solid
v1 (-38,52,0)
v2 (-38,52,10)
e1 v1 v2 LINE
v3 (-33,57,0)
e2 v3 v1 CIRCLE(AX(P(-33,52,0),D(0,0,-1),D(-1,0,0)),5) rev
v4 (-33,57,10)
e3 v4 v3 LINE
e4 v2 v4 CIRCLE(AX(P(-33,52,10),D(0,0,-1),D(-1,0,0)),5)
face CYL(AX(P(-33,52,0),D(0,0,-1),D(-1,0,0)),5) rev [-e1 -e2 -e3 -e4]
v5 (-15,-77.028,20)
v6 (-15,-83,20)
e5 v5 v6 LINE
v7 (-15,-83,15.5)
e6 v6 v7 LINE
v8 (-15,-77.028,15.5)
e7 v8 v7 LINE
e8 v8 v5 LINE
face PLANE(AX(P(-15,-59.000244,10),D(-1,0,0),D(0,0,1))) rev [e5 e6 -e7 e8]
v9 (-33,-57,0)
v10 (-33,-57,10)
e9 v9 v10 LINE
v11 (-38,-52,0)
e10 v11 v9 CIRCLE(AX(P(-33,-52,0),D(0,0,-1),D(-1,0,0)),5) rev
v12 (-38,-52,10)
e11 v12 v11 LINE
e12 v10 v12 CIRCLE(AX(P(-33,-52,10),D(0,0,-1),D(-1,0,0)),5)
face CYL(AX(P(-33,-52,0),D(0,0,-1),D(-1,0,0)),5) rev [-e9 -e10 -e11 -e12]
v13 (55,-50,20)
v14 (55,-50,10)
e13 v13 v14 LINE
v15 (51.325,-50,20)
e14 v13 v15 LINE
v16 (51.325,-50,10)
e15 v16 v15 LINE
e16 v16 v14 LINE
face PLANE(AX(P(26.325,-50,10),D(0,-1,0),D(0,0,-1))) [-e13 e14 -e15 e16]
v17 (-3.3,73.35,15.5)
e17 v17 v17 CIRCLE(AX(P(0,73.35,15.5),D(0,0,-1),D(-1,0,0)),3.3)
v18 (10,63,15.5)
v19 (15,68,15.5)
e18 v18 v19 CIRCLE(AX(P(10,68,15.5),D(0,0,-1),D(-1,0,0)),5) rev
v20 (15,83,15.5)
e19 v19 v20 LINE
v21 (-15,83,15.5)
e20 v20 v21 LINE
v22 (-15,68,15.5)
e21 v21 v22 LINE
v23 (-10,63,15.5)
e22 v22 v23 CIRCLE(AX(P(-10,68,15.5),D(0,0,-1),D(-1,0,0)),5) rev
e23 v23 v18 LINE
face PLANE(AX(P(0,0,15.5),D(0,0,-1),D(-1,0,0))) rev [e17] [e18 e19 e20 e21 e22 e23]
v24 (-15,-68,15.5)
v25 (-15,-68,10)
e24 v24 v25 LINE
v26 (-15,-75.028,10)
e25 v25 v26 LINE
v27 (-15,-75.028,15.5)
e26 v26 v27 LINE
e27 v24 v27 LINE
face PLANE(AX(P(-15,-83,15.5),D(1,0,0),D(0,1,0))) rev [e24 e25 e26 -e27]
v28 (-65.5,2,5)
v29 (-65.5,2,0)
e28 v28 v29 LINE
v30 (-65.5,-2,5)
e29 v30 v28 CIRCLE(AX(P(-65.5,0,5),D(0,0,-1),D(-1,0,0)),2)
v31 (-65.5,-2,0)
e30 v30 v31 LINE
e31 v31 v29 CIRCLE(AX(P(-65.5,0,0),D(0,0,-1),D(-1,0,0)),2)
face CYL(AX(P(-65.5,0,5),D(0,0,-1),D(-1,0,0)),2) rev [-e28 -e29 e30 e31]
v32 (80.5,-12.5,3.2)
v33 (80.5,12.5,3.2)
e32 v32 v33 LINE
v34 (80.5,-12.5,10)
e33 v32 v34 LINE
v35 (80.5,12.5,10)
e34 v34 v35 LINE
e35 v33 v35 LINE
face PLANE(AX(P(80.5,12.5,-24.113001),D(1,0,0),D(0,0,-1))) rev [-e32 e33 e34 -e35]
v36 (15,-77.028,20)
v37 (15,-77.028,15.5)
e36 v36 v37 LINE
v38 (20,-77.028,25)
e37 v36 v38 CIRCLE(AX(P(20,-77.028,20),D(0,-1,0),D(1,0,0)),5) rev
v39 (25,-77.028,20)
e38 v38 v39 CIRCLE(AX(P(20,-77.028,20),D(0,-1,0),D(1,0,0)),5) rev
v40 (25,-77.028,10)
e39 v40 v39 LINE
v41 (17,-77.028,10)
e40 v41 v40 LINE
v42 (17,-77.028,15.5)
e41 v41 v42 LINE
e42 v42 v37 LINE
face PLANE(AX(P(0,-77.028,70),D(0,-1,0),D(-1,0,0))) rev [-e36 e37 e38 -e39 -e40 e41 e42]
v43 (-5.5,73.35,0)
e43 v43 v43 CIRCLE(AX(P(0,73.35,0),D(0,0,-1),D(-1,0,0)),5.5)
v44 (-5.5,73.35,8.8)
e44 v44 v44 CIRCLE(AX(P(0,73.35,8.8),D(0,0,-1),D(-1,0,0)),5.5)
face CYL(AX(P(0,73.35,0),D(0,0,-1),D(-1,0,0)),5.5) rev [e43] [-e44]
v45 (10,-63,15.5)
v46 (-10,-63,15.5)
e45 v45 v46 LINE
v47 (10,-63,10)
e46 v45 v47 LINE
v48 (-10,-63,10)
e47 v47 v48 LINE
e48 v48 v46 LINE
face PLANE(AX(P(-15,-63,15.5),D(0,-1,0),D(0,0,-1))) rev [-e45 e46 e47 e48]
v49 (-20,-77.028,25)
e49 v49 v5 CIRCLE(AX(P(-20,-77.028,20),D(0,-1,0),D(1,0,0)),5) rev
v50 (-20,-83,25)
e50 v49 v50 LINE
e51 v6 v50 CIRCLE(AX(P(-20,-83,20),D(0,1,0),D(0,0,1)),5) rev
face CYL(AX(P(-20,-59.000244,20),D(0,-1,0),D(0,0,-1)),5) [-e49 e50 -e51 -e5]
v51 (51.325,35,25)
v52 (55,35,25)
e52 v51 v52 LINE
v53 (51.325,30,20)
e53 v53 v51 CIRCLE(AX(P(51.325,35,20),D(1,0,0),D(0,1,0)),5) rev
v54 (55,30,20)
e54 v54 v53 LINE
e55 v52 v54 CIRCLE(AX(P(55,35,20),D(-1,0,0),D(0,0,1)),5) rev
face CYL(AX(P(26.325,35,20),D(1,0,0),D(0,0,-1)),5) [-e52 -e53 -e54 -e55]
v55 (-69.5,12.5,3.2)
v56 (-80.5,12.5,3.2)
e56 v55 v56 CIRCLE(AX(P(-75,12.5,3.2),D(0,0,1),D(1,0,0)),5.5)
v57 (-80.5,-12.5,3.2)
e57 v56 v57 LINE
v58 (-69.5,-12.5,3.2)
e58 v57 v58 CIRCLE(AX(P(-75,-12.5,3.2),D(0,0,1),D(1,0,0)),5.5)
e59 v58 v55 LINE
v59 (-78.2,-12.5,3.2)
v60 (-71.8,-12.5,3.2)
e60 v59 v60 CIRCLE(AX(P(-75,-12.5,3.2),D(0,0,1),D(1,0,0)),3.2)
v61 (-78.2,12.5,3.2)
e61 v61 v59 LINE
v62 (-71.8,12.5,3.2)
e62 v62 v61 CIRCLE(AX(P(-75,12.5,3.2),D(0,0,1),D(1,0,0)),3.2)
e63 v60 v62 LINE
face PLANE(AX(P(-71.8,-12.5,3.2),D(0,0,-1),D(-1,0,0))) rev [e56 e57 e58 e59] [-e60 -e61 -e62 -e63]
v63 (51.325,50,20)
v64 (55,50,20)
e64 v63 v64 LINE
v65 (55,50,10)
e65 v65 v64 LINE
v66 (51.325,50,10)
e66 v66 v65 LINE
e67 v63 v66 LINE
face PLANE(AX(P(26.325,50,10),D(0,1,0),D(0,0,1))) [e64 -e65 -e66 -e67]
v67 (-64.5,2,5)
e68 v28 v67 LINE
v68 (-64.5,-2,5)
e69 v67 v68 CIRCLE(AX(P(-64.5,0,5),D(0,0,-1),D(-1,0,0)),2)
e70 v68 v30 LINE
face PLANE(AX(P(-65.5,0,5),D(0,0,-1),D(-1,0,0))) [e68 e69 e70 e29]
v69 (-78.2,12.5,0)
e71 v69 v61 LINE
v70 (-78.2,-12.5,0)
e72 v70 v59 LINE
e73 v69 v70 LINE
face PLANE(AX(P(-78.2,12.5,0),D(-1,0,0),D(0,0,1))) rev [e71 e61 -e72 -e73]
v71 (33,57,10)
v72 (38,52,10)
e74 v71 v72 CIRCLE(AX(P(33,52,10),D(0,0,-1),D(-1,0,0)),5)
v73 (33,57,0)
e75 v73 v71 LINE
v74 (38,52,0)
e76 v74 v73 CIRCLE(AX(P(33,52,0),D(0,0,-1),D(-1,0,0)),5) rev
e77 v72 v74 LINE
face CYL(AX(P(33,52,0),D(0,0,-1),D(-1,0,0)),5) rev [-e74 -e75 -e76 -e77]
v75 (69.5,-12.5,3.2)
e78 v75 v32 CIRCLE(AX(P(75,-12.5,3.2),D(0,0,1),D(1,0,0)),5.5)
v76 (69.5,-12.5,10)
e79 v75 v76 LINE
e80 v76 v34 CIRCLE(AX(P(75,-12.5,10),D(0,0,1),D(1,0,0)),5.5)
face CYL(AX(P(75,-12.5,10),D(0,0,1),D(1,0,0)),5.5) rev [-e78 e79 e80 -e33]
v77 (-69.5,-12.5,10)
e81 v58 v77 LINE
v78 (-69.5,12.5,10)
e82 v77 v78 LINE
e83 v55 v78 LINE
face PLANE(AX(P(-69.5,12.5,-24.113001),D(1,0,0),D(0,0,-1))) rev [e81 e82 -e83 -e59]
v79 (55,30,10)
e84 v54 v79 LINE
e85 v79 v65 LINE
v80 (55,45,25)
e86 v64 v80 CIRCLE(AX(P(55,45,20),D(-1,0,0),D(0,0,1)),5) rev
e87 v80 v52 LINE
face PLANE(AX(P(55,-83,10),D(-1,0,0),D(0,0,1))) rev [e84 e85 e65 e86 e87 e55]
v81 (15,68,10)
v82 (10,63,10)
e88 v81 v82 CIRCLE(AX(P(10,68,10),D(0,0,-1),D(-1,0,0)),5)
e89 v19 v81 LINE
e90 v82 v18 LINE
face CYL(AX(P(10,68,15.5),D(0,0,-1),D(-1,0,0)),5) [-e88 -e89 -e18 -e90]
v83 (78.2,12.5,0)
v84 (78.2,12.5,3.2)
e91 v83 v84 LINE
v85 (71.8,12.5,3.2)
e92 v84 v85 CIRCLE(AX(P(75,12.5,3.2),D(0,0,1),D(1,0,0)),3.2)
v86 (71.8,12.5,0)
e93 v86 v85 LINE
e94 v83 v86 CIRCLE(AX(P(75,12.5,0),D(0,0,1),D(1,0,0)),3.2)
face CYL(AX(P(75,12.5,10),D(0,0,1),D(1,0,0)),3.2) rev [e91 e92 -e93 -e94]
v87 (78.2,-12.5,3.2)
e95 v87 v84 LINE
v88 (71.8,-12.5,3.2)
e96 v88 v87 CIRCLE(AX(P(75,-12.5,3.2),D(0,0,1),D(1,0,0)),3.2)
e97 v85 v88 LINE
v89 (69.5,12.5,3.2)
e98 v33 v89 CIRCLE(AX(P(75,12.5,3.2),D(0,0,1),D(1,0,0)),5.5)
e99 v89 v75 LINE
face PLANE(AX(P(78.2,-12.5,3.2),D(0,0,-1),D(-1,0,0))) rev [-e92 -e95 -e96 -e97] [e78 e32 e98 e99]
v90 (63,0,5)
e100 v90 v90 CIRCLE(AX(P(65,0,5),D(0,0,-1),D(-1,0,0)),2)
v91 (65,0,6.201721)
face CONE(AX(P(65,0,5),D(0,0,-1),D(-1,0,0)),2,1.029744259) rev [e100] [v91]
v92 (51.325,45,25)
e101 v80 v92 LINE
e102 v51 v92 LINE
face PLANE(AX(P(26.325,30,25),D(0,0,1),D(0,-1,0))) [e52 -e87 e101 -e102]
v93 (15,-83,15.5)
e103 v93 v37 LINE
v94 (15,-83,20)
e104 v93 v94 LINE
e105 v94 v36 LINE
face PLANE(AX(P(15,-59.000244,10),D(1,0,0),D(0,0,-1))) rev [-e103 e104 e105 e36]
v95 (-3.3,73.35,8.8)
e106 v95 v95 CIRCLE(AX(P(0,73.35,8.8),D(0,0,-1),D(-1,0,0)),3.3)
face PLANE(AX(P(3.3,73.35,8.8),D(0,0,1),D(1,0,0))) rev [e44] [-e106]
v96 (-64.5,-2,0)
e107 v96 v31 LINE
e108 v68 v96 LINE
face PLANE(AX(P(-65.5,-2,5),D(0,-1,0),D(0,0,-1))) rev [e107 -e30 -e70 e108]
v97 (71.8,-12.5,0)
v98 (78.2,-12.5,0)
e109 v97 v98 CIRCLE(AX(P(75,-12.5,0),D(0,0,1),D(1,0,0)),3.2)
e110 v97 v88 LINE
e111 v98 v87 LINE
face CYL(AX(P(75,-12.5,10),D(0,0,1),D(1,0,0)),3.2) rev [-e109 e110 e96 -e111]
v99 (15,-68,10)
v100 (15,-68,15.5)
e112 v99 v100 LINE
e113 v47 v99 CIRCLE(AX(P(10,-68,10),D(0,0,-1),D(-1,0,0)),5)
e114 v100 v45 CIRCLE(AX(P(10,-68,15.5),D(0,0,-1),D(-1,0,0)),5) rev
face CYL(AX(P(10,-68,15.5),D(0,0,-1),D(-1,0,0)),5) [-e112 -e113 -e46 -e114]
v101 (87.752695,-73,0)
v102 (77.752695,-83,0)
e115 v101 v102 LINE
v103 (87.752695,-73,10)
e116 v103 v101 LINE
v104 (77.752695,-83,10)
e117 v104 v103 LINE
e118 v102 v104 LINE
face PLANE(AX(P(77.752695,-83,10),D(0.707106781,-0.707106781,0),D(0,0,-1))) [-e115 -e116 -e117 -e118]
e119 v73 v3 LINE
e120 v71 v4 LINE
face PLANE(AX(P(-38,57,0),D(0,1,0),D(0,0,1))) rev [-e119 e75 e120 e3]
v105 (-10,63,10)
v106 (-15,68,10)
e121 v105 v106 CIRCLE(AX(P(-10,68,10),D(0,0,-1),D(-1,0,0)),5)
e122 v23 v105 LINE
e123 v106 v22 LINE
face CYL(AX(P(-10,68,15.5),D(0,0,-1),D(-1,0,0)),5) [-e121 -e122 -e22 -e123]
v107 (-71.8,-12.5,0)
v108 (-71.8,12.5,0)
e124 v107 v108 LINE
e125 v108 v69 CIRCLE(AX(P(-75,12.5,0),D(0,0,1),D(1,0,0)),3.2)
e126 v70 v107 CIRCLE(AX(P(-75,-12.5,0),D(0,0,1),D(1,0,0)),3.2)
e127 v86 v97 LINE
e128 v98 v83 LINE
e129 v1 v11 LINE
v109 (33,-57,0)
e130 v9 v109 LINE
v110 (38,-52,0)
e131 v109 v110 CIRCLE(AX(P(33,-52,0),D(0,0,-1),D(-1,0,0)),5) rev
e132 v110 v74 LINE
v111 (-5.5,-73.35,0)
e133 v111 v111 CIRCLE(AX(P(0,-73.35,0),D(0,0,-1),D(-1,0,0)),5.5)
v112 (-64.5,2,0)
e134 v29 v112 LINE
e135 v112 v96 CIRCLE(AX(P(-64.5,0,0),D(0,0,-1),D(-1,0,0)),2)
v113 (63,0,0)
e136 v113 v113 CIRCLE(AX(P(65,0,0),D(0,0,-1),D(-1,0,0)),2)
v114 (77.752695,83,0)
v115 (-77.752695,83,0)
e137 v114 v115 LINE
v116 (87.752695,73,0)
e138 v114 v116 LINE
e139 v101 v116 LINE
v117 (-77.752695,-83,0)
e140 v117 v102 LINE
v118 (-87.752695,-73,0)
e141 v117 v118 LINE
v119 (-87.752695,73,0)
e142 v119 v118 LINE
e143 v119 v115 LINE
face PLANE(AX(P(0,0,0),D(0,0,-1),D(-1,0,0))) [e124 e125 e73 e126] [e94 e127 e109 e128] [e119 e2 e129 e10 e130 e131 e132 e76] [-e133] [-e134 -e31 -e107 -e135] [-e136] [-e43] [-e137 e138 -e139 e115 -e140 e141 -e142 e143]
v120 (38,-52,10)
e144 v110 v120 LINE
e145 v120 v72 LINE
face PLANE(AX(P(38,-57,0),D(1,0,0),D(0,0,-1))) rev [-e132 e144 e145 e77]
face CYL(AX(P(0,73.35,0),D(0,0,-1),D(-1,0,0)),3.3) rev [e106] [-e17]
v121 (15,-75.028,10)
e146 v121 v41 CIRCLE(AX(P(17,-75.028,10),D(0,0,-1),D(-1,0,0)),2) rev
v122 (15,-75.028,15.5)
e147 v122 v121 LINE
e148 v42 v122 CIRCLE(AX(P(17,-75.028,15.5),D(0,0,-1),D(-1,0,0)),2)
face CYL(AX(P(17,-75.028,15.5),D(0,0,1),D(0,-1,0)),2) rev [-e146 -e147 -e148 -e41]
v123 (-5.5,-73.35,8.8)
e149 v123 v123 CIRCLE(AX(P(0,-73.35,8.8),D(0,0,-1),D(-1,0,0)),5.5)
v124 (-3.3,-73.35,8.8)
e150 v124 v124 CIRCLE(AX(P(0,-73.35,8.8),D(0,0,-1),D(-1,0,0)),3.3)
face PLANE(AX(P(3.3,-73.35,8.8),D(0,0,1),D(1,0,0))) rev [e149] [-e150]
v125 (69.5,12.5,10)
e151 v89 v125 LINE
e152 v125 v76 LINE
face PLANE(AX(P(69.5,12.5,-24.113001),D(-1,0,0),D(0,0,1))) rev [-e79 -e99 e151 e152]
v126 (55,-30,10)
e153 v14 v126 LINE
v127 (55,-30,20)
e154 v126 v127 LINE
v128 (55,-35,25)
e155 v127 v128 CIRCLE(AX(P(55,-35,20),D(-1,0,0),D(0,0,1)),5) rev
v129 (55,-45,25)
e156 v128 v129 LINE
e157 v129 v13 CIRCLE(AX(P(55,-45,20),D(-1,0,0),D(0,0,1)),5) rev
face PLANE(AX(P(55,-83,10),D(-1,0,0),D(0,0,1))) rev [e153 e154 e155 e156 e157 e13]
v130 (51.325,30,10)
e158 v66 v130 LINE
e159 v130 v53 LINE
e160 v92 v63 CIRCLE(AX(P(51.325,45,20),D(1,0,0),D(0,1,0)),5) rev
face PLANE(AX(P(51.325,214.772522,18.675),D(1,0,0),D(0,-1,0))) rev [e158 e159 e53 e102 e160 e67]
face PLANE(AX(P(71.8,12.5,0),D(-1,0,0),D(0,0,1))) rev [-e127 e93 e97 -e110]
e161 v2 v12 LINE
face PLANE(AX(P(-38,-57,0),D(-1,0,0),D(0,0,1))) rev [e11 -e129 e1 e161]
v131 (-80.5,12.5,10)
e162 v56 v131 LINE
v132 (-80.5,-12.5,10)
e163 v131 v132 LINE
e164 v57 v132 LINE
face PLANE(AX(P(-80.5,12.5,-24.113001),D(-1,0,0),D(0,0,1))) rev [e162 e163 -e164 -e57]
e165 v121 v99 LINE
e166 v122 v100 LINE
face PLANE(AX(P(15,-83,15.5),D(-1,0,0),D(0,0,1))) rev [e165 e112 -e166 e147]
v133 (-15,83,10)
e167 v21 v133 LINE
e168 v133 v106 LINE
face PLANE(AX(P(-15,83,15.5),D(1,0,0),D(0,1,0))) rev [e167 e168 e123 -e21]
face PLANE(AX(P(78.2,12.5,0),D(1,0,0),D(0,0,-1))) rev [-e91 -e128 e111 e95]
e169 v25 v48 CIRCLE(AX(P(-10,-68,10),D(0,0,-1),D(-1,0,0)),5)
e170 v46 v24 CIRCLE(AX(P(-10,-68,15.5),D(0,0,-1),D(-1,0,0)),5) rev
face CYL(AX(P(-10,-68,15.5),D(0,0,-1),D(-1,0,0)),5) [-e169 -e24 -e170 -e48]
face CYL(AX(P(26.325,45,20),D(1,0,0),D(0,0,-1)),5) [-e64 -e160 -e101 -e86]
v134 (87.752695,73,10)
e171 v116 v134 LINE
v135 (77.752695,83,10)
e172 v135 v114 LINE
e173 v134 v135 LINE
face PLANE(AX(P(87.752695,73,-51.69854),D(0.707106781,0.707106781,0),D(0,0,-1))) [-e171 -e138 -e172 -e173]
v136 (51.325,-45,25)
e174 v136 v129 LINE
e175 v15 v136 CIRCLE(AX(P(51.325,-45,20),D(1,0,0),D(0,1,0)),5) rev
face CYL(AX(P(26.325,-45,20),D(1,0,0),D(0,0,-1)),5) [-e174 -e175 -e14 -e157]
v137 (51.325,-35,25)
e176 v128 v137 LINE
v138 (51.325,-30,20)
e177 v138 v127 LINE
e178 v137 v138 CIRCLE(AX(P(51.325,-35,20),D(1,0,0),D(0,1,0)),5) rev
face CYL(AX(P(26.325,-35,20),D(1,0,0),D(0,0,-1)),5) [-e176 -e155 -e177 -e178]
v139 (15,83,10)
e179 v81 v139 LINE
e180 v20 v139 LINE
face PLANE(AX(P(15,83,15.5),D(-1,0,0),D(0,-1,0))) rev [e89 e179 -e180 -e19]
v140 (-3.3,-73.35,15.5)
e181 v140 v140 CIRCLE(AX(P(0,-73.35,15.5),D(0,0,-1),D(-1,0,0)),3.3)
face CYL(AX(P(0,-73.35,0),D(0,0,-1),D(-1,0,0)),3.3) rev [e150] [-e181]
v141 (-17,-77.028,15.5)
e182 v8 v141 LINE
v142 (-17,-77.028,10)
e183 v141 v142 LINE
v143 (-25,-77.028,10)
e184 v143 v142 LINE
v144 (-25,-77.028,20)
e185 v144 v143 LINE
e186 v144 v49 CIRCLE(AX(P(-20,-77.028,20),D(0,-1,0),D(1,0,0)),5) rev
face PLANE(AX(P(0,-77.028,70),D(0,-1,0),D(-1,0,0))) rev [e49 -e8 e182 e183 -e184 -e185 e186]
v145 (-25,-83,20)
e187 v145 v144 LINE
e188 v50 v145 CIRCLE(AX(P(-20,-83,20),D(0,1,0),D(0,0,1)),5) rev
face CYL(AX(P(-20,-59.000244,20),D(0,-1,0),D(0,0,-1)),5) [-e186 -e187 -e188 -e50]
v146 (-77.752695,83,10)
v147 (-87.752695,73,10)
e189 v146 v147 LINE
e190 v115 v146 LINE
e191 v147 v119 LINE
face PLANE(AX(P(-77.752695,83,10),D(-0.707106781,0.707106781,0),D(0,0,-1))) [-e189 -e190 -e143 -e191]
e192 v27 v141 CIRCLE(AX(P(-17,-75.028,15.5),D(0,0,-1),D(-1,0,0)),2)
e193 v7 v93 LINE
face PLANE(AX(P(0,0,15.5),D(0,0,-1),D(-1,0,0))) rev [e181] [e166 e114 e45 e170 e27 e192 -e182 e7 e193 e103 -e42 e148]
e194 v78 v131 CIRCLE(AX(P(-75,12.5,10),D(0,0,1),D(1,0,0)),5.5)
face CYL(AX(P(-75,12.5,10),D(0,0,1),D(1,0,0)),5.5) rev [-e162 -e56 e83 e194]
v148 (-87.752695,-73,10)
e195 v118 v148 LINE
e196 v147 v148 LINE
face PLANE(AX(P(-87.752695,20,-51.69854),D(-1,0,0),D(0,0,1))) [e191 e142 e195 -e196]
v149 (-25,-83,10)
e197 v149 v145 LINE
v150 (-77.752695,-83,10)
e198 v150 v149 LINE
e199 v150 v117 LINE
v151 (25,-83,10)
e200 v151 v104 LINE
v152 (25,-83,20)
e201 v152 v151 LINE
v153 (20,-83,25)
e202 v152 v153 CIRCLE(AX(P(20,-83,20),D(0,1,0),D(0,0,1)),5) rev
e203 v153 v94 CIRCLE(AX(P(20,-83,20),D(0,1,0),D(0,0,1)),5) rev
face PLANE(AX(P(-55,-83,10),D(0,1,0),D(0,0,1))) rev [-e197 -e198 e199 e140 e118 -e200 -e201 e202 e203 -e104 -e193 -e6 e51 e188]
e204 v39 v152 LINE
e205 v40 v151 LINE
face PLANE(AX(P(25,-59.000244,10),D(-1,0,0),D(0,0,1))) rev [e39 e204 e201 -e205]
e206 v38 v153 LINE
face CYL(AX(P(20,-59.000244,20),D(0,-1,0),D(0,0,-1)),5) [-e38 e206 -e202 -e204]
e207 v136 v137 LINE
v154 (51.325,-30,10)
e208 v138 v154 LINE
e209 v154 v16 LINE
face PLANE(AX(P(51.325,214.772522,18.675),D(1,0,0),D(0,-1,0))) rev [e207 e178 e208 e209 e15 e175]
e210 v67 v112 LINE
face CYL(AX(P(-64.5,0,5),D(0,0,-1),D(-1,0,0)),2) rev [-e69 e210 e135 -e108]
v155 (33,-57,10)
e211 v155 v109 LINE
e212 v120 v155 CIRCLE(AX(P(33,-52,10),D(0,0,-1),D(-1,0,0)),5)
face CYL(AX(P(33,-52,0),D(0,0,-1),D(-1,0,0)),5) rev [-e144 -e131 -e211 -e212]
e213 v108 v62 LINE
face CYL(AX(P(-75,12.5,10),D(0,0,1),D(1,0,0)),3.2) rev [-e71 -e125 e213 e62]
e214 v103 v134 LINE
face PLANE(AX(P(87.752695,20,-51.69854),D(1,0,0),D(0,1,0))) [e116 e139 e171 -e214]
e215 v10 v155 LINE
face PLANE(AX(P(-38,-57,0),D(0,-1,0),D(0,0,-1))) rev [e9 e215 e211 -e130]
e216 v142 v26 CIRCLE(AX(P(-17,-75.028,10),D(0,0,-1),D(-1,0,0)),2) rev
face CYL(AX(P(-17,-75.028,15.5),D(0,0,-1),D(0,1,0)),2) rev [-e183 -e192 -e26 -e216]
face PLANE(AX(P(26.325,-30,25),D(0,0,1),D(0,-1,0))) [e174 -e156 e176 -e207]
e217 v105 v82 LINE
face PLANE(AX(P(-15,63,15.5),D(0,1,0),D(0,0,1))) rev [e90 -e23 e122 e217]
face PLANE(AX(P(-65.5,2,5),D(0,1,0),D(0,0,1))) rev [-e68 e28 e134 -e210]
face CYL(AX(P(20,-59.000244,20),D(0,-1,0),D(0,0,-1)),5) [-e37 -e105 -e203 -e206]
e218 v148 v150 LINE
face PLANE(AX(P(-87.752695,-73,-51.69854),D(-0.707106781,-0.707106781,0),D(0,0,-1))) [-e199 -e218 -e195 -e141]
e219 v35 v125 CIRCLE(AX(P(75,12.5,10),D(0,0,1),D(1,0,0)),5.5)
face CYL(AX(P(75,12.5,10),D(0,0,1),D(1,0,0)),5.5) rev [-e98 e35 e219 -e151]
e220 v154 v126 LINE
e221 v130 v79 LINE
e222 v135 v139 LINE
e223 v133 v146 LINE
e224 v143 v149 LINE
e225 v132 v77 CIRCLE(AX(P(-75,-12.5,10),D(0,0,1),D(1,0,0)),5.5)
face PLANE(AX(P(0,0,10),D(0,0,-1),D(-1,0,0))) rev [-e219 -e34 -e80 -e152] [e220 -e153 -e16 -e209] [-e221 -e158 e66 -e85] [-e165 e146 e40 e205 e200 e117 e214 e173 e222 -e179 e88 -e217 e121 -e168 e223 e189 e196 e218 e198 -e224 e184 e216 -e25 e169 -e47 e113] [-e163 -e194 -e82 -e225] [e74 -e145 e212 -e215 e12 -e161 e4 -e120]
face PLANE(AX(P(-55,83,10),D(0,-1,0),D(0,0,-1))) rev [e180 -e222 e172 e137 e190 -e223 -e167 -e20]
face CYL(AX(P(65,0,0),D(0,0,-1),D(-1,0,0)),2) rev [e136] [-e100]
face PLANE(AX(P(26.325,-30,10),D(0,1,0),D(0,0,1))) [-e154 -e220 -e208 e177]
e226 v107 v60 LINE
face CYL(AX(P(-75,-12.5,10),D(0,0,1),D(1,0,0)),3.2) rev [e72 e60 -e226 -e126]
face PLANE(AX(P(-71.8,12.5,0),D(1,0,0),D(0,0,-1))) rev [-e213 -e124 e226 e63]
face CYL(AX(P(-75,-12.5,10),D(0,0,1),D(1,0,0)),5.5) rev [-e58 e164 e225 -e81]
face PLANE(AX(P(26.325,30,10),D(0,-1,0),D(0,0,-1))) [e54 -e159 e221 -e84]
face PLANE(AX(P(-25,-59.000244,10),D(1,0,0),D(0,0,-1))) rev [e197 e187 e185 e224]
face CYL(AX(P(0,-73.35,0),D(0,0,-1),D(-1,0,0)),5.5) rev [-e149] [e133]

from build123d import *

# Parameters (mm, degrees)
SKETCH_1_W                            = 110
SKETCH_1_H                            = 166
EXTRUDE_1_DEPTH                       = 10
SKETCH_2_W                            = 30
SKETCH_2_H                            = 20
EXTRUDE_2_DEPTH                       = 5.5
HOLE_WIZARD_2_D                       = 6.6
HOLE_WIZARD_2_CBORE_D                 = 11
HOLE_WIZARD_2_CBORE_DEPTH             = 8.8
FILLET_2_R                            = 15
FILLET_3_R                            = 5
SKETCH_9_W                            = 76
SKETCH_9_H                            = 114
CUT_EXTRUDE_1_DEPTH                   = 101.069975517
FILLET_4_R                            = 5
SKETCH_11_W                           = 32.752695491
SKETCH_11_H                           = 40
EXTRUDE_4_DEPTH                       = 10
HOLE_WIZARD_2_2_D                     = 6.4
HOLE_WIZARD_2_2_CBORE_D               = 11
HOLE_WIZARD_2_2_CBORE_DEPTH           = 6.8
HOLE_WIZARD_2_2_ON_FACE_2_D           = 6.4
HOLE_WIZARD_2_2_ON_FACE_2_CBORE_D     = 11
HOLE_WIZARD_2_2_ON_FACE_2_CBORE_DEPTH = 6.8
SKETCH_14_W                           = 11
SKETCH_14_H                           = 25
CUT_EXTRUDE_3_DEPTH                   = 6.8
FILLET_5_R                            = 5
SKETCH_16_W                           = 6.4
SKETCH_16_H                           = 25
CUT_EXTRUDE_5_DEPTH                   = 122.411801593
SKETCH_17_W                           = 10
SKETCH_17_H                           = 15
EXTRUDE_5_DEPTH                       = 5.971999808
EXTRUDE_START                         = -3.675
SKETCH_18_W                           = 15
SKETCH_18_H                           = 20
EXTRUDE_6_DEPTH                       = 3.675
FILLET_6_R                            = 5
FILLET_7_R                            = 2
MM_1_D                                = 4
MM_1_DEPTH                            = 5
MM_1_TIP                              = 1.201721238
CUT_EXTRUDE_6_DEPTH                   = 5
EXTRUDE_START_2                       = -10
EXTRUDE_7_DEPTH                       = 10
CHAMFER_1_SIZE                        = 10


with BuildPart() as part:
    # 草图1 → 凸台-拉伸1 (new body)
    with BuildSketch(Plane.XY):
        Rectangle(SKETCH_1_W, SKETCH_1_H)
    extrude(amount=EXTRUDE_1_DEPTH)

    # 草图2 → 凸台-拉伸2 (add)
    with BuildSketch(Plane.XY.offset(10)):
        with Locations((0, -73)):
            Rectangle(SKETCH_2_W, SKETCH_2_H)
        with Locations((0, 73)):
            Rectangle(SKETCH_2_W, SKETCH_2_H)
    extrude(amount=EXTRUDE_2_DEPTH)

    # Hole Wizard 2 (through all)
    with Locations(Plane(origin=(0, 0, 0), x_dir=(-1, 0, 0), z_dir=(0, 0, -1))):
        with Locations((0, -73.35), (0, 73.35)):
            CounterBoreHole(HOLE_WIZARD_2_D / 2, HOLE_WIZARD_2_CBORE_D / 2, HOLE_WIZARD_2_CBORE_DEPTH)

    # 圆角2
    fillet_2_edges = [part.edges().sort_by_distance(p)[0] for p in [
        (55, -83, 5),
        (-55, -83, 5),
        (-55, 83, 5),
        (55, 83, 5),
    ]]
    fillet(fillet_2_edges, radius=FILLET_2_R)

    # 圆角3
    fillet_3_edges = [part.edges().sort_by_distance(p)[0] for p in [
        (-15, -63, 12.75),
        (15, -63, 12.75),
        (-15, 63, 12.75),
        (15, 63, 12.75),
    ]]
    fillet(fillet_3_edges, radius=FILLET_3_R)

    # 草图9 → 切除-拉伸1 (cut, through all)
    with BuildSketch(Plane.XY.offset(10)):
        Rectangle(SKETCH_9_W, SKETCH_9_H)
    extrude(amount=-CUT_EXTRUDE_1_DEPTH, mode=Mode.SUBTRACT)

    # 圆角4
    fillet_4_edges = [part.edges().sort_by_distance(p)[0] for p in [
        (38, 57, 5),
        (38, -57, 5),
        (-38, -57, 5),
        (-38, 57, 5),
    ]]
    fillet(fillet_4_edges, radius=FILLET_4_R)

    # 草图11 → 凸台-拉伸4 (add)
    with BuildSketch(Plane.XY.offset(10)):
        with Locations((-71.376347745, 0)):
            Rectangle(SKETCH_11_W, SKETCH_11_H)
        with Locations((71.376347745, 0)):
            Rectangle(SKETCH_11_W, SKETCH_11_H)
    extrude(amount=-EXTRUDE_4_DEPTH)

    # Hole Wizard 2 2 (through all)
    with Locations(Plane(origin=(75, -12.5, 10), x_dir=(1, 0, 0), z_dir=(0, 0, 1))):
        with Locations((0, 0), (-150, 25), (-150, 0), (0, 25)):
            CounterBoreHole(HOLE_WIZARD_2_2_D / 2, HOLE_WIZARD_2_2_CBORE_D / 2, HOLE_WIZARD_2_2_CBORE_DEPTH)

    # Hole Wizard 2 2 on face 2 (through all)
    with Locations(Plane(origin=(-121.442232178, 88.770272999, 0), x_dir=(1, 0, 0), z_dir=(0, 0, 1))):
        with Locations((0, 0)):
            CounterBoreHole(HOLE_WIZARD_2_2_ON_FACE_2_D / 2, HOLE_WIZARD_2_2_ON_FACE_2_CBORE_D / 2, HOLE_WIZARD_2_2_ON_FACE_2_CBORE_DEPTH)

    # 草图14 → 切除-拉伸3 (cut)
    with BuildSketch(Plane.XY.offset(10)):
        with Locations((-75, 0)):
            Rectangle(SKETCH_14_W, SKETCH_14_H)
        with Locations((75, 0)):
            Rectangle(SKETCH_14_W, SKETCH_14_H)
    extrude(amount=-CUT_EXTRUDE_3_DEPTH, mode=Mode.SUBTRACT)

    # 圆角5
    fillet_5_edges = [part.edges().sort_by_distance(p)[0] for p in [
        (-87.752695491, 20, 5),
        (-87.752695491, -20, 5),
        (-55, -20, 5),
        (-55, 20, 5),
        (55, -20, 5),
        (87.752695491, -20, 5),
        (87.752695491, 20, 5),
        (55, 20, 5),
    ]]
    fillet(fillet_5_edges, radius=FILLET_5_R)

    # 草图16 → 切除-拉伸5 (cut, through all)
    with BuildSketch(Plane.XY.offset(3.2)):
        with Locations((-75, 0)):
            Rectangle(SKETCH_16_W, SKETCH_16_H)
        with Locations((75, 0)):
            Rectangle(SKETCH_16_W, SKETCH_16_H)
    extrude(amount=-CUT_EXTRUDE_5_DEPTH, mode=Mode.SUBTRACT)

    # 草图17 → 凸台-拉伸5 (add)
    with BuildSketch(Plane(origin=(0, -83, 0), x_dir=(1, 0, 0), z_dir=(0, 1, 0))):
        with Locations((-20, -17.5)):
            Rectangle(SKETCH_17_W, SKETCH_17_H)
        with Locations((20, -17.5)):
            Rectangle(SKETCH_17_W, SKETCH_17_H)
    extrude(amount=EXTRUDE_5_DEPTH)

    # 草图18 → 凸台-拉伸6 (add)
    with BuildSketch(Plane(origin=(55, 0, 0), x_dir=(0, 0, -1), z_dir=(1, 0, 0)).offset(EXTRUDE_START)):
        with Locations((-17.5, 40)):
            Rectangle(SKETCH_18_W, SKETCH_18_H)
        with Locations((-17.5, -40)):
            Rectangle(SKETCH_18_W, SKETCH_18_H)
    extrude(amount=EXTRUDE_6_DEPTH)

    # 圆角6
    fillet_6_edges = [part.edges().sort_by_distance(p)[0] for p in [
        (53.1625, 50, 25),
        (53.1625, 30, 25),
        (53.1625, -30, 25),
        (53.1625, -50, 25),
        (25, -80.014000096, 25),
        (15, -80.014000096, 25),
        (-15, -80.014000096, 25),
        (-25, -80.014000096, 25),
    ]]
    fillet(fillet_6_edges, radius=FILLET_6_R - 0.0001)  # a hair under: the kernel refuses the full size

    # 圆角7
    fillet_7_edges = [part.edges().sort_by_distance(p)[0] for p in [
        (-15, -77.028000192, 12.75),
        (15, -77.028000192, 12.75),
    ]]
    fillet(fillet_7_edges, radius=FILLET_7_R)

    # 大小mm 暗销孔1
    with Locations(Plane(origin=(65, 0, 0), x_dir=(-1, 0, 0), z_dir=(0, 0, -1))):
        with Locations((0, 0)):
            Hole(MM_1_D / 2, depth=MM_1_DEPTH)
            with Locations((0, 0, -(MM_1_DEPTH + MM_1_TIP / 2))):  # 118° drill point
                Cone(0, MM_1_D / 2, MM_1_TIP, mode=Mode.SUBTRACT)

    # 草图21 → 切除-拉伸6 (cut)
    with BuildSketch(Plane(origin=(0, 0, 0), x_dir=(-1, 0, 0), z_dir=(0, 0, -1))):
        with BuildLine():
            Line((65.5, -2), (64.5, -2))
            ThreePointArc((64.5, -2), (62.5, 0), (64.5, 2))
            Line((64.5, 2), (65.5, 2))
            ThreePointArc((65.5, 2), (67.5, 0), (65.5, -2))
        make_face()
    extrude(amount=-CUT_EXTRUDE_6_DEPTH, mode=Mode.SUBTRACT)

    # 草图23 → 凸台-拉伸7 (add)
    with BuildSketch(Plane.XY.offset(10).offset(EXTRUDE_START_2)):
        with BuildLine():
            Line((-40, 83), (-87.752695491, 83))
            Line((-87.752695491, 83), (-87.752695491, 15))
            ThreePointArc((-87.752695491, 15), (-86.288229397, 18.535533906), (-82.752695491, 20))
            Line((-82.752695491, 20), (-60, 20))
            ThreePointArc((-60, 20), (-56.464466094, 21.464466094), (-55, 25))
            Line((-55, 25), (-55, 68))
            ThreePointArc((-55, 68), (-50.606601718, 78.606601718), (-40, 83))
        make_face()
        with BuildLine():
            ThreePointArc((-82.752695491, -20), (-86.288229397, -18.535533906), (-87.752695491, -15))
            Line((-87.752695491, -15), (-87.752695491, -83))
            Line((-87.752695491, -83), (-40, -83))
            ThreePointArc((-40, -83), (-50.606601718, -78.606601718), (-55, -68))
            Line((-55, -68), (-55, -25))
            ThreePointArc((-55, -25), (-56.464466094, -21.464466094), (-60, -20))
            Line((-60, -20), (-82.752695491, -20))
        make_face()
        with BuildLine():
            Line((87.752695491, -83), (87.752695491, -15))
            ThreePointArc((87.752695491, -15), (86.288229397, -18.535533906), (82.752695491, -20))
            Line((82.752695491, -20), (60, -20))
            ThreePointArc((60, -20), (56.464466094, -21.464466094), (55, -25))
            Line((55, -25), (55, -30))
            Line((55, -30), (51.324999949, -30))
            Line((51.324999949, -30), (51.324999949, -50))
            Line((51.324999949, -50), (55, -50))
            Line((55, -50), (55, -68))
            ThreePointArc((55, -68), (50.606601718, -78.606601718), (40, -83))
            Line((40, -83), (87.752695491, -83))
        make_face()
        with BuildLine():
            Line((87.752695491, 83), (40, 83))
            ThreePointArc((40, 83), (50.606601718, 78.606601718), (55, 68))
            Line((55, 68), (55, 50))
            Line((55, 50), (51.324999949, 50))
            Line((51.324999949, 50), (51.324999949, 30))
            Line((51.324999949, 30), (55, 30))
            Line((55, 30), (55, 25))
            ThreePointArc((55, 25), (56.464466094, 21.464466094), (60, 20))
            Line((60, 20), (82.752695491, 20))
            ThreePointArc((82.752695491, 20), (86.288229397, 18.535533906), (87.752695491, 15))
            Line((87.752695491, 15), (87.752695491, 83))
        make_face()
    extrude(amount=EXTRUDE_7_DEPTH)

    # 倒角1
    chamfer_1_edges = [part.edges().sort_by_distance(p)[0] for p in [
        (-87.752695491, 83, 5),
        (-87.752695491, -83, 5),
        (87.752695491, -83, 5),
        (87.752695491, 83, 5),
    ]]
    chamfer(chamfer_1_edges, length=CHAMFER_1_SIZE)


solid = part.part
